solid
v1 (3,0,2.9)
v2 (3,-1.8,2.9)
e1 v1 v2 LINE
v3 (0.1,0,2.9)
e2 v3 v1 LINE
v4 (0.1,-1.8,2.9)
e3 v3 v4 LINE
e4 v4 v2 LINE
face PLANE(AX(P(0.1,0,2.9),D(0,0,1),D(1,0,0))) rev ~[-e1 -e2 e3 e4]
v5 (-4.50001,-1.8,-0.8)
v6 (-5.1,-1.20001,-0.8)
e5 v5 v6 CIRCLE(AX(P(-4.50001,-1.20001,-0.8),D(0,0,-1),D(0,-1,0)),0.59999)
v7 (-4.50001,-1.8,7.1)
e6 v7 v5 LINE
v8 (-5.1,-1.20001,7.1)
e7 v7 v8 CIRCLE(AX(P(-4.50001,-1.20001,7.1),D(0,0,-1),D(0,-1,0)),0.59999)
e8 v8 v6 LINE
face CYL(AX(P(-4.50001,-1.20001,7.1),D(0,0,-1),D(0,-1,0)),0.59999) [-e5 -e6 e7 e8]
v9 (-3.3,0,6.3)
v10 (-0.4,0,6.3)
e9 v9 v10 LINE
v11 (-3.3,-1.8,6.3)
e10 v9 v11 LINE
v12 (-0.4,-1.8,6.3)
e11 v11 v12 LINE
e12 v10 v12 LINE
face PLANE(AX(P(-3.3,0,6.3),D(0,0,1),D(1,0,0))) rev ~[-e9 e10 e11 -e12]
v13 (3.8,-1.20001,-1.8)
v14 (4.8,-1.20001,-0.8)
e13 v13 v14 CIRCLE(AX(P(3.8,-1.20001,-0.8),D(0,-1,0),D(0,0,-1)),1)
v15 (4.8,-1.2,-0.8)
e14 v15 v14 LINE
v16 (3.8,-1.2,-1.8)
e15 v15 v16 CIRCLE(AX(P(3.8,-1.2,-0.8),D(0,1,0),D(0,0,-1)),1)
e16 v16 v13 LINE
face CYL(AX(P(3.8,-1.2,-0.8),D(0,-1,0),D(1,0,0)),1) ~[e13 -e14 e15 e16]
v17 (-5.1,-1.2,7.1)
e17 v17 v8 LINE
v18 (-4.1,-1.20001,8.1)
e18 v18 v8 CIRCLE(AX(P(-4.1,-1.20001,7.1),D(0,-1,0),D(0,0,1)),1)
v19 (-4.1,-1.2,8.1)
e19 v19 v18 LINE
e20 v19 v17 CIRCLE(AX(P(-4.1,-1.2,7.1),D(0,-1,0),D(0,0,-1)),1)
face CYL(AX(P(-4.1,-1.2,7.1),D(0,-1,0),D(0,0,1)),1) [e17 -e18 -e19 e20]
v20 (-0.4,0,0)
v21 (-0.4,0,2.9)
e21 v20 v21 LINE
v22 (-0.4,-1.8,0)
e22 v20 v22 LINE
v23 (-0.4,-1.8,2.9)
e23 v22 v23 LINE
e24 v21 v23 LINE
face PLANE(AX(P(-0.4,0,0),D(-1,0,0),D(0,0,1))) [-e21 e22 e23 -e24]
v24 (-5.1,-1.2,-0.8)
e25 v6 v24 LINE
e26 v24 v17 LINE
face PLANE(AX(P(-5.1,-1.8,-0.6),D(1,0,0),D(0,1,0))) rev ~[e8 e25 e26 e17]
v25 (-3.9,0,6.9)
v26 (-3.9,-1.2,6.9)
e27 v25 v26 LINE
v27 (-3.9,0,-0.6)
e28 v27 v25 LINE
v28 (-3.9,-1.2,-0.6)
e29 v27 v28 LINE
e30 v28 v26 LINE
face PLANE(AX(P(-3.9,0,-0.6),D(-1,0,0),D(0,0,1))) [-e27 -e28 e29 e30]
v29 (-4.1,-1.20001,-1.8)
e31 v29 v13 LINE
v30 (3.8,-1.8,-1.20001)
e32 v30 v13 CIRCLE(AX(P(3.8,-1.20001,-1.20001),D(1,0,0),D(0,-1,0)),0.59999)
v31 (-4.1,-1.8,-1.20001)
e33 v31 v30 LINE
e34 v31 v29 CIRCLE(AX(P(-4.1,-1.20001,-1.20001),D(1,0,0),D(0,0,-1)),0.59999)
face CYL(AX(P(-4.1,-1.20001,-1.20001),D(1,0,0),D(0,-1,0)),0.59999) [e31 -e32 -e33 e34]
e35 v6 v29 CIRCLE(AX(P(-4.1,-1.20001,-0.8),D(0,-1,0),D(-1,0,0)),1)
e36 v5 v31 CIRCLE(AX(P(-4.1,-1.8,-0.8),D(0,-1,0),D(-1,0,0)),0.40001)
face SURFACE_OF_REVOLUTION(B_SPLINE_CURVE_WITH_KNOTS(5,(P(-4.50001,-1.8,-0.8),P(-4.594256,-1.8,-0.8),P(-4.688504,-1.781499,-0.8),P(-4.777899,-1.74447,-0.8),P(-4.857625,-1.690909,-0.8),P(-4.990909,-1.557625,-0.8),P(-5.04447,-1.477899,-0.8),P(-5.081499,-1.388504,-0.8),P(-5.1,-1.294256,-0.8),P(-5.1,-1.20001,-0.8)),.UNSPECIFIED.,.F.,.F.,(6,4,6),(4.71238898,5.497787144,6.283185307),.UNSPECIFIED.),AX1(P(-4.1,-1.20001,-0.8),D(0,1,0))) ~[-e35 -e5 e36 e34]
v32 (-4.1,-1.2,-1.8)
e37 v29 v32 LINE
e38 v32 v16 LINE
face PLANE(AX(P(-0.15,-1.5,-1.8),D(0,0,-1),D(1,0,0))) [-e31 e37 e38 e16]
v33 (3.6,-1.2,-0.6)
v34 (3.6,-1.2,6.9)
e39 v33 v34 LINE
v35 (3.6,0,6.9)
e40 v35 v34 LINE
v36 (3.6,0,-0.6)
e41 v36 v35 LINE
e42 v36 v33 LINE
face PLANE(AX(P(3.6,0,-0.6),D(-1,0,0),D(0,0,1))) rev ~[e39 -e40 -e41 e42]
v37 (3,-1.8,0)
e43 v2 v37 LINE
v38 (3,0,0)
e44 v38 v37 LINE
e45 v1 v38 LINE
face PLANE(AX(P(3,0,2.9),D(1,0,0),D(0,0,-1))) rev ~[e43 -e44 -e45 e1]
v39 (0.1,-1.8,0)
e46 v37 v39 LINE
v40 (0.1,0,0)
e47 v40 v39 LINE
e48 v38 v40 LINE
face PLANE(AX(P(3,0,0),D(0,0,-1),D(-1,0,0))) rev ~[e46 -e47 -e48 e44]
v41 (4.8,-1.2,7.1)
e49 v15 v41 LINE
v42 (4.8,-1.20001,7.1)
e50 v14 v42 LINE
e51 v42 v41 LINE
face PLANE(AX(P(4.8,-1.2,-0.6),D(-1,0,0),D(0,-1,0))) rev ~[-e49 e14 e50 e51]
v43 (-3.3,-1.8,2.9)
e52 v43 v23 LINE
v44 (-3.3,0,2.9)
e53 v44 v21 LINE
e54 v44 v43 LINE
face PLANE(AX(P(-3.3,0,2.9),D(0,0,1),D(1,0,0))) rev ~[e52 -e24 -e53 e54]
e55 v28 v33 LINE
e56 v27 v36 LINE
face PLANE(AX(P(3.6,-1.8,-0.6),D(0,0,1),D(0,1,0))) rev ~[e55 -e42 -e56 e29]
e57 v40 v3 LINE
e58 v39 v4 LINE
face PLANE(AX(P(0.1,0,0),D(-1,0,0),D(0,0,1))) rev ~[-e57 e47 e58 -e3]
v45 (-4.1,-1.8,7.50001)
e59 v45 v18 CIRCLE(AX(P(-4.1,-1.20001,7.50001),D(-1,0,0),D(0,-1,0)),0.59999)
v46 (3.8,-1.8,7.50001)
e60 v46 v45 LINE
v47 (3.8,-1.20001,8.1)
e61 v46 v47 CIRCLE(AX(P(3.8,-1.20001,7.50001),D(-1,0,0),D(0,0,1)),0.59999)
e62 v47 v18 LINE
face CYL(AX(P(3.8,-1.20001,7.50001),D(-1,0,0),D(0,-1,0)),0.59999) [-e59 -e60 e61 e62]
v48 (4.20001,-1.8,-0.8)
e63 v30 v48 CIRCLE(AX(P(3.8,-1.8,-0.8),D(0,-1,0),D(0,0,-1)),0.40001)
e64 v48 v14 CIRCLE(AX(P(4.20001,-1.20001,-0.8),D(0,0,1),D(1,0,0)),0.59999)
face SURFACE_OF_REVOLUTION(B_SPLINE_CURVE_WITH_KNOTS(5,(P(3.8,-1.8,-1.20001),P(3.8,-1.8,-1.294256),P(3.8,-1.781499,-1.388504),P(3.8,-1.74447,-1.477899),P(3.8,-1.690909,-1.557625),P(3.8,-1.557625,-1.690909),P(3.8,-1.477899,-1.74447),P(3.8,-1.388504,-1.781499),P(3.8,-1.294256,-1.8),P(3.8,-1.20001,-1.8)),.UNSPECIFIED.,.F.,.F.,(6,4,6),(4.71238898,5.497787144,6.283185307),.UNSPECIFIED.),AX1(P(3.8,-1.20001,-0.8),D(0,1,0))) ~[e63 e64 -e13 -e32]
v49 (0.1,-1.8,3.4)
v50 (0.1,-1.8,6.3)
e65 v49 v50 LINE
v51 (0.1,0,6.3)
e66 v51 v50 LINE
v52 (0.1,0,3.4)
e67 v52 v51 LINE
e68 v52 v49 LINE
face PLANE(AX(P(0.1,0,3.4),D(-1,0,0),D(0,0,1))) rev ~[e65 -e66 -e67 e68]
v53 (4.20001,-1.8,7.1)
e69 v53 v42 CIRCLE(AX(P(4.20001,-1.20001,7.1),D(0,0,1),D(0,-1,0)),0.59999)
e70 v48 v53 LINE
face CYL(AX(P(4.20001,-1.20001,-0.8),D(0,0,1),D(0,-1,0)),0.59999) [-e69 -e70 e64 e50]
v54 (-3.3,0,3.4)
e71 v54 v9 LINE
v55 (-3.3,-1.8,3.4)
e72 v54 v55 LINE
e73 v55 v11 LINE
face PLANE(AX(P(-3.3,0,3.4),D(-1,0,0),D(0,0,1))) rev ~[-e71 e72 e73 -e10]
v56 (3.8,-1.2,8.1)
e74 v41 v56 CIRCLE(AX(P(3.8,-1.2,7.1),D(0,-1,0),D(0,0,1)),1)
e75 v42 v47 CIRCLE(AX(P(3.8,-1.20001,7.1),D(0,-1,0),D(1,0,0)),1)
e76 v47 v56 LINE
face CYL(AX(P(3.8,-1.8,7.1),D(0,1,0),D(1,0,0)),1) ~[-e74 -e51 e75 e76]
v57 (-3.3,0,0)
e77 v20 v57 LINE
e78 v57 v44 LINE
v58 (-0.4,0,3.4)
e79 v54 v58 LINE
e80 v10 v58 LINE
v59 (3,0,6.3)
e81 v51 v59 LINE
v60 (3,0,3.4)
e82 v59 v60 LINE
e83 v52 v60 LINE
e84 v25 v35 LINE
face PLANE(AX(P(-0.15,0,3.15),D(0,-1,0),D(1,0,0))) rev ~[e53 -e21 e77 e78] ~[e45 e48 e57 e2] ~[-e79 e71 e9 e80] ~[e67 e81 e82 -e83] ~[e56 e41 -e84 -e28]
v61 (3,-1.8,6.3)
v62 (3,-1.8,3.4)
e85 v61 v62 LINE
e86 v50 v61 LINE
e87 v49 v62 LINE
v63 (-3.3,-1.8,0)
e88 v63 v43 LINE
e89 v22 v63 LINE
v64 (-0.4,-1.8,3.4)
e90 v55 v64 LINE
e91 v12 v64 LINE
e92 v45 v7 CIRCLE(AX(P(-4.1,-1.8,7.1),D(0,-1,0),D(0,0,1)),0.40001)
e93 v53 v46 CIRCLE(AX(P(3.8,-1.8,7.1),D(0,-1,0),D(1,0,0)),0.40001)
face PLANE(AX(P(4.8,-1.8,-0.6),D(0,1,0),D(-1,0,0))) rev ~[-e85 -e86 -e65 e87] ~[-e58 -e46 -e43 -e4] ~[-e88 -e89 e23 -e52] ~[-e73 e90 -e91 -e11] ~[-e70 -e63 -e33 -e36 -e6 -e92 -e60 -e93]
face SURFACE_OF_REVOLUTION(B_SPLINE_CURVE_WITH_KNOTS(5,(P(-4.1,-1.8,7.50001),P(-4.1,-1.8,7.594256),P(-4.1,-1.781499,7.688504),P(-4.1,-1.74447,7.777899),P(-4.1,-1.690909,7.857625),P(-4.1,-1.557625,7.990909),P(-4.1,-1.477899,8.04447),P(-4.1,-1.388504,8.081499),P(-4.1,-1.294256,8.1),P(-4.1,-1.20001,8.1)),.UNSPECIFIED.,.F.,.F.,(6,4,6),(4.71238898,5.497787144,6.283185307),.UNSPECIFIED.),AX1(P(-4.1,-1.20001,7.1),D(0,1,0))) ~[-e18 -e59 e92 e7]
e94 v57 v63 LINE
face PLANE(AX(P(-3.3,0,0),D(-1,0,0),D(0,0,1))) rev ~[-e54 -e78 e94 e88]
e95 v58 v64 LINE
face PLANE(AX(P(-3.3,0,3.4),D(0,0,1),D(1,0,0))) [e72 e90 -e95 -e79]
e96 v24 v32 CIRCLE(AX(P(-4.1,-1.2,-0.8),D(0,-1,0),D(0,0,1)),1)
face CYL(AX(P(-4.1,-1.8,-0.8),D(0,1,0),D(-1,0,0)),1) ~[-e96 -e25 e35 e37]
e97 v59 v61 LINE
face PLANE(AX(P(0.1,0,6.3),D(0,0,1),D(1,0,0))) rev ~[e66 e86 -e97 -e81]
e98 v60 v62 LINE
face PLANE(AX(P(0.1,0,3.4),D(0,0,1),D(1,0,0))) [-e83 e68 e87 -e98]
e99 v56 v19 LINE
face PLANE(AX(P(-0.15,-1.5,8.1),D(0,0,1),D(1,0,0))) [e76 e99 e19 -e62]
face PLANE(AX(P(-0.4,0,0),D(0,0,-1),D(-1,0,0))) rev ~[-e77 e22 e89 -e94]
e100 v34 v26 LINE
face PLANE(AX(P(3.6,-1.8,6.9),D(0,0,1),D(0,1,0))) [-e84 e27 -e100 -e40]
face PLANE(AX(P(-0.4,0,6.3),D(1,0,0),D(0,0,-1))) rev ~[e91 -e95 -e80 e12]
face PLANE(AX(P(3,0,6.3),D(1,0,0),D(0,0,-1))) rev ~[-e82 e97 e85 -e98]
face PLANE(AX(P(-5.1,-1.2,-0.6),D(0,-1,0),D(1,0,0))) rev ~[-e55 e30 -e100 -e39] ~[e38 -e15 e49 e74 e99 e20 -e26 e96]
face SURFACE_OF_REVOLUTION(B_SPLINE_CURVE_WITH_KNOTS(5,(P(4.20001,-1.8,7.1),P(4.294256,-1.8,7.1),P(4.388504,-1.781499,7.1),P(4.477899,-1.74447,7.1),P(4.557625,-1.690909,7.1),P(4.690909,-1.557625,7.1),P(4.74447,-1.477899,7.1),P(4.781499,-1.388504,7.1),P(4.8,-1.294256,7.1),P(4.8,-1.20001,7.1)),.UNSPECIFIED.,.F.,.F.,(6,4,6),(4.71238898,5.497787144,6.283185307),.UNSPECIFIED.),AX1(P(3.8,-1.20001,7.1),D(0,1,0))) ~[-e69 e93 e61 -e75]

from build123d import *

# Parameters (mm, degrees)
F0_W     = 7.5
F0_H     = 7.5
F0_W_2   = 0.1
F0_H_2   = 0.1
F0_H_3   = 2.9
F0_W_3   = 0.3
F0_W_4   = 2.9
F1_DEPTH = 1.8
F2_W     = 0.6
F2_H     = 7.5
F3_DEPTH = 1.2
F4_W     = 0.6
F4_H     = 7.5
F5_DEPTH = 1.2
F7_DEPTH = 1.2
F9_DEPTH = 1.2
F10_R    = 1
F11_R    = 0.59999


# Not quite as in the source:
# - a fillet or chamfer is up to 0.001 mm smaller than in the source, because OpenCascade refuses the exact size


with BuildPart() as f1:
    # F0 (on Front) → F1 (new body)
    with BuildSketch(Plane.XZ):
        with Locations((-0.15, 3.15)):
            Rectangle(F0_W, F0_H)
        Polygon((-0.3, 3), (-0.3, 2.9), (-0.3, 0), (-0.4, 0), (-3.3, 0), (-3.3, 2.9), (-3.3, 3), (-0.4, 3), align=None, mode=Mode.SUBTRACT)
        Polygon((0.1, 0), (0, 0), (0, 2.9), (0, 3), (0.1, 3), (3, 3), (3, 2.9), (3, 0), align=None, mode=Mode.SUBTRACT)
        Polygon((0.1, 3.3), (0, 3.3), (-0.3, 3.3), (-0.4, 3.3), (-3.3, 3.3), (-3.3, 3.4), (-3.3, 6.3), (-0.4, 6.3), (-0.3, 6.3), (-0.3, 3.4), (0, 3.4), (0, 6.3), (0.1, 6.3), (3, 6.3), (3, 3.4), (3, 3.3), align=None, mode=Mode.SUBTRACT)
        with Locations((-0.35, 3.35)):
            Rectangle(F0_W_2, F0_H_2)
        with Locations((-0.35, 4.85)):
            Rectangle(F0_W_2, F0_H_3)
        with Locations((0.05, 3.35)):
            Rectangle(F0_W_2, F0_H_2)
        with Locations((0.05, 4.85)):
            Rectangle(F0_W_2, F0_H_3)
        with Locations((-0.15, 3.35)):
            Rectangle(F0_W_3, F0_H_2)
        with Locations((-1.85, 3.35)):
            Rectangle(F0_W_4, F0_H_2)
        with Locations((1.55, 3.35)):
            Rectangle(F0_W_4, F0_H_2)
        with Locations((1.55, 2.95)):
            Rectangle(F0_W_4, F0_H_2)
        with Locations((-1.85, 2.95)):
            Rectangle(F0_W_4, F0_H_2)
        with Locations((-0.35, 1.45)):
            Rectangle(F0_W_2, F0_H_3)
        with Locations((0.05, 1.45)):
            Rectangle(F0_W_2, F0_H_3)
        with Locations((0.05, 2.95)):
            Rectangle(F0_W_2, F0_H_2)
        with Locations((-0.35, 2.95)):
            Rectangle(F0_W_2, F0_H_2)
    extrude(amount=F1_DEPTH)

    # F2 (on face) → F3 (join)
    with BuildSketch(Plane(origin=(-3.9, 0, 0), x_dir=(0, -1, 0), z_dir=(-1, 0, 0))):
        with Locations((1.5, 3.15)):
            Rectangle(F2_W, F2_H)
    extrude(amount=F3_DEPTH)

    # F4 (on face) → F5 (join)
    with BuildSketch(Plane.YZ.offset(3.6)):
        with Locations((-1.5, 3.15)):
            Rectangle(F4_W, F4_H)
    extrude(amount=F5_DEPTH)

    # F6 (on face) → F7 (join)
    with BuildSketch(Plane.XY.offset(6.9)):
        Polygon((-5.1, -1.2), (-5.1, -1.2278293749), (-5.1, -1.8), (4.8, -1.8), (4.8, -1.2), (3.6, -1.2), (-3.9, -1.2), align=None)
    extrude(amount=F7_DEPTH)

    # F8 (on face) → F9 (join)
    with BuildSketch(Plane(origin=(0, 0, -0.6), x_dir=(1, 0, 0), z_dir=(0, 0, -1))):
        Polygon((3.6, 1.2), (4.8, 1.2), (4.8, 1.8), (-5.1, 1.8), (-5.1, 1.2), (-3.9, 1.2), align=None)
    extrude(amount=F9_DEPTH)

    # F10
    f10_edges = [f1.edges().sort_by_distance(p)[0] for p in [
        (-5.1, -1.5, -1.8),
        (4.8, -1.5, -1.8),
        (4.8, -1.5, 8.1),
        (-5.1, -1.5, 8.1),
    ]]
    fillet(f10_edges, radius=F10_R)

    # F11 (radius 0.6 in the source; OpenCascade refuses exactly that, so slightly less here)
    f11_edges = [f1.edges().sort_by_distance(p)[0] for p in [
        (-5.1, -1.8, 3.15),
    ]]
    fillet(f11_edges, radius=F11_R)


solid = f1.part
